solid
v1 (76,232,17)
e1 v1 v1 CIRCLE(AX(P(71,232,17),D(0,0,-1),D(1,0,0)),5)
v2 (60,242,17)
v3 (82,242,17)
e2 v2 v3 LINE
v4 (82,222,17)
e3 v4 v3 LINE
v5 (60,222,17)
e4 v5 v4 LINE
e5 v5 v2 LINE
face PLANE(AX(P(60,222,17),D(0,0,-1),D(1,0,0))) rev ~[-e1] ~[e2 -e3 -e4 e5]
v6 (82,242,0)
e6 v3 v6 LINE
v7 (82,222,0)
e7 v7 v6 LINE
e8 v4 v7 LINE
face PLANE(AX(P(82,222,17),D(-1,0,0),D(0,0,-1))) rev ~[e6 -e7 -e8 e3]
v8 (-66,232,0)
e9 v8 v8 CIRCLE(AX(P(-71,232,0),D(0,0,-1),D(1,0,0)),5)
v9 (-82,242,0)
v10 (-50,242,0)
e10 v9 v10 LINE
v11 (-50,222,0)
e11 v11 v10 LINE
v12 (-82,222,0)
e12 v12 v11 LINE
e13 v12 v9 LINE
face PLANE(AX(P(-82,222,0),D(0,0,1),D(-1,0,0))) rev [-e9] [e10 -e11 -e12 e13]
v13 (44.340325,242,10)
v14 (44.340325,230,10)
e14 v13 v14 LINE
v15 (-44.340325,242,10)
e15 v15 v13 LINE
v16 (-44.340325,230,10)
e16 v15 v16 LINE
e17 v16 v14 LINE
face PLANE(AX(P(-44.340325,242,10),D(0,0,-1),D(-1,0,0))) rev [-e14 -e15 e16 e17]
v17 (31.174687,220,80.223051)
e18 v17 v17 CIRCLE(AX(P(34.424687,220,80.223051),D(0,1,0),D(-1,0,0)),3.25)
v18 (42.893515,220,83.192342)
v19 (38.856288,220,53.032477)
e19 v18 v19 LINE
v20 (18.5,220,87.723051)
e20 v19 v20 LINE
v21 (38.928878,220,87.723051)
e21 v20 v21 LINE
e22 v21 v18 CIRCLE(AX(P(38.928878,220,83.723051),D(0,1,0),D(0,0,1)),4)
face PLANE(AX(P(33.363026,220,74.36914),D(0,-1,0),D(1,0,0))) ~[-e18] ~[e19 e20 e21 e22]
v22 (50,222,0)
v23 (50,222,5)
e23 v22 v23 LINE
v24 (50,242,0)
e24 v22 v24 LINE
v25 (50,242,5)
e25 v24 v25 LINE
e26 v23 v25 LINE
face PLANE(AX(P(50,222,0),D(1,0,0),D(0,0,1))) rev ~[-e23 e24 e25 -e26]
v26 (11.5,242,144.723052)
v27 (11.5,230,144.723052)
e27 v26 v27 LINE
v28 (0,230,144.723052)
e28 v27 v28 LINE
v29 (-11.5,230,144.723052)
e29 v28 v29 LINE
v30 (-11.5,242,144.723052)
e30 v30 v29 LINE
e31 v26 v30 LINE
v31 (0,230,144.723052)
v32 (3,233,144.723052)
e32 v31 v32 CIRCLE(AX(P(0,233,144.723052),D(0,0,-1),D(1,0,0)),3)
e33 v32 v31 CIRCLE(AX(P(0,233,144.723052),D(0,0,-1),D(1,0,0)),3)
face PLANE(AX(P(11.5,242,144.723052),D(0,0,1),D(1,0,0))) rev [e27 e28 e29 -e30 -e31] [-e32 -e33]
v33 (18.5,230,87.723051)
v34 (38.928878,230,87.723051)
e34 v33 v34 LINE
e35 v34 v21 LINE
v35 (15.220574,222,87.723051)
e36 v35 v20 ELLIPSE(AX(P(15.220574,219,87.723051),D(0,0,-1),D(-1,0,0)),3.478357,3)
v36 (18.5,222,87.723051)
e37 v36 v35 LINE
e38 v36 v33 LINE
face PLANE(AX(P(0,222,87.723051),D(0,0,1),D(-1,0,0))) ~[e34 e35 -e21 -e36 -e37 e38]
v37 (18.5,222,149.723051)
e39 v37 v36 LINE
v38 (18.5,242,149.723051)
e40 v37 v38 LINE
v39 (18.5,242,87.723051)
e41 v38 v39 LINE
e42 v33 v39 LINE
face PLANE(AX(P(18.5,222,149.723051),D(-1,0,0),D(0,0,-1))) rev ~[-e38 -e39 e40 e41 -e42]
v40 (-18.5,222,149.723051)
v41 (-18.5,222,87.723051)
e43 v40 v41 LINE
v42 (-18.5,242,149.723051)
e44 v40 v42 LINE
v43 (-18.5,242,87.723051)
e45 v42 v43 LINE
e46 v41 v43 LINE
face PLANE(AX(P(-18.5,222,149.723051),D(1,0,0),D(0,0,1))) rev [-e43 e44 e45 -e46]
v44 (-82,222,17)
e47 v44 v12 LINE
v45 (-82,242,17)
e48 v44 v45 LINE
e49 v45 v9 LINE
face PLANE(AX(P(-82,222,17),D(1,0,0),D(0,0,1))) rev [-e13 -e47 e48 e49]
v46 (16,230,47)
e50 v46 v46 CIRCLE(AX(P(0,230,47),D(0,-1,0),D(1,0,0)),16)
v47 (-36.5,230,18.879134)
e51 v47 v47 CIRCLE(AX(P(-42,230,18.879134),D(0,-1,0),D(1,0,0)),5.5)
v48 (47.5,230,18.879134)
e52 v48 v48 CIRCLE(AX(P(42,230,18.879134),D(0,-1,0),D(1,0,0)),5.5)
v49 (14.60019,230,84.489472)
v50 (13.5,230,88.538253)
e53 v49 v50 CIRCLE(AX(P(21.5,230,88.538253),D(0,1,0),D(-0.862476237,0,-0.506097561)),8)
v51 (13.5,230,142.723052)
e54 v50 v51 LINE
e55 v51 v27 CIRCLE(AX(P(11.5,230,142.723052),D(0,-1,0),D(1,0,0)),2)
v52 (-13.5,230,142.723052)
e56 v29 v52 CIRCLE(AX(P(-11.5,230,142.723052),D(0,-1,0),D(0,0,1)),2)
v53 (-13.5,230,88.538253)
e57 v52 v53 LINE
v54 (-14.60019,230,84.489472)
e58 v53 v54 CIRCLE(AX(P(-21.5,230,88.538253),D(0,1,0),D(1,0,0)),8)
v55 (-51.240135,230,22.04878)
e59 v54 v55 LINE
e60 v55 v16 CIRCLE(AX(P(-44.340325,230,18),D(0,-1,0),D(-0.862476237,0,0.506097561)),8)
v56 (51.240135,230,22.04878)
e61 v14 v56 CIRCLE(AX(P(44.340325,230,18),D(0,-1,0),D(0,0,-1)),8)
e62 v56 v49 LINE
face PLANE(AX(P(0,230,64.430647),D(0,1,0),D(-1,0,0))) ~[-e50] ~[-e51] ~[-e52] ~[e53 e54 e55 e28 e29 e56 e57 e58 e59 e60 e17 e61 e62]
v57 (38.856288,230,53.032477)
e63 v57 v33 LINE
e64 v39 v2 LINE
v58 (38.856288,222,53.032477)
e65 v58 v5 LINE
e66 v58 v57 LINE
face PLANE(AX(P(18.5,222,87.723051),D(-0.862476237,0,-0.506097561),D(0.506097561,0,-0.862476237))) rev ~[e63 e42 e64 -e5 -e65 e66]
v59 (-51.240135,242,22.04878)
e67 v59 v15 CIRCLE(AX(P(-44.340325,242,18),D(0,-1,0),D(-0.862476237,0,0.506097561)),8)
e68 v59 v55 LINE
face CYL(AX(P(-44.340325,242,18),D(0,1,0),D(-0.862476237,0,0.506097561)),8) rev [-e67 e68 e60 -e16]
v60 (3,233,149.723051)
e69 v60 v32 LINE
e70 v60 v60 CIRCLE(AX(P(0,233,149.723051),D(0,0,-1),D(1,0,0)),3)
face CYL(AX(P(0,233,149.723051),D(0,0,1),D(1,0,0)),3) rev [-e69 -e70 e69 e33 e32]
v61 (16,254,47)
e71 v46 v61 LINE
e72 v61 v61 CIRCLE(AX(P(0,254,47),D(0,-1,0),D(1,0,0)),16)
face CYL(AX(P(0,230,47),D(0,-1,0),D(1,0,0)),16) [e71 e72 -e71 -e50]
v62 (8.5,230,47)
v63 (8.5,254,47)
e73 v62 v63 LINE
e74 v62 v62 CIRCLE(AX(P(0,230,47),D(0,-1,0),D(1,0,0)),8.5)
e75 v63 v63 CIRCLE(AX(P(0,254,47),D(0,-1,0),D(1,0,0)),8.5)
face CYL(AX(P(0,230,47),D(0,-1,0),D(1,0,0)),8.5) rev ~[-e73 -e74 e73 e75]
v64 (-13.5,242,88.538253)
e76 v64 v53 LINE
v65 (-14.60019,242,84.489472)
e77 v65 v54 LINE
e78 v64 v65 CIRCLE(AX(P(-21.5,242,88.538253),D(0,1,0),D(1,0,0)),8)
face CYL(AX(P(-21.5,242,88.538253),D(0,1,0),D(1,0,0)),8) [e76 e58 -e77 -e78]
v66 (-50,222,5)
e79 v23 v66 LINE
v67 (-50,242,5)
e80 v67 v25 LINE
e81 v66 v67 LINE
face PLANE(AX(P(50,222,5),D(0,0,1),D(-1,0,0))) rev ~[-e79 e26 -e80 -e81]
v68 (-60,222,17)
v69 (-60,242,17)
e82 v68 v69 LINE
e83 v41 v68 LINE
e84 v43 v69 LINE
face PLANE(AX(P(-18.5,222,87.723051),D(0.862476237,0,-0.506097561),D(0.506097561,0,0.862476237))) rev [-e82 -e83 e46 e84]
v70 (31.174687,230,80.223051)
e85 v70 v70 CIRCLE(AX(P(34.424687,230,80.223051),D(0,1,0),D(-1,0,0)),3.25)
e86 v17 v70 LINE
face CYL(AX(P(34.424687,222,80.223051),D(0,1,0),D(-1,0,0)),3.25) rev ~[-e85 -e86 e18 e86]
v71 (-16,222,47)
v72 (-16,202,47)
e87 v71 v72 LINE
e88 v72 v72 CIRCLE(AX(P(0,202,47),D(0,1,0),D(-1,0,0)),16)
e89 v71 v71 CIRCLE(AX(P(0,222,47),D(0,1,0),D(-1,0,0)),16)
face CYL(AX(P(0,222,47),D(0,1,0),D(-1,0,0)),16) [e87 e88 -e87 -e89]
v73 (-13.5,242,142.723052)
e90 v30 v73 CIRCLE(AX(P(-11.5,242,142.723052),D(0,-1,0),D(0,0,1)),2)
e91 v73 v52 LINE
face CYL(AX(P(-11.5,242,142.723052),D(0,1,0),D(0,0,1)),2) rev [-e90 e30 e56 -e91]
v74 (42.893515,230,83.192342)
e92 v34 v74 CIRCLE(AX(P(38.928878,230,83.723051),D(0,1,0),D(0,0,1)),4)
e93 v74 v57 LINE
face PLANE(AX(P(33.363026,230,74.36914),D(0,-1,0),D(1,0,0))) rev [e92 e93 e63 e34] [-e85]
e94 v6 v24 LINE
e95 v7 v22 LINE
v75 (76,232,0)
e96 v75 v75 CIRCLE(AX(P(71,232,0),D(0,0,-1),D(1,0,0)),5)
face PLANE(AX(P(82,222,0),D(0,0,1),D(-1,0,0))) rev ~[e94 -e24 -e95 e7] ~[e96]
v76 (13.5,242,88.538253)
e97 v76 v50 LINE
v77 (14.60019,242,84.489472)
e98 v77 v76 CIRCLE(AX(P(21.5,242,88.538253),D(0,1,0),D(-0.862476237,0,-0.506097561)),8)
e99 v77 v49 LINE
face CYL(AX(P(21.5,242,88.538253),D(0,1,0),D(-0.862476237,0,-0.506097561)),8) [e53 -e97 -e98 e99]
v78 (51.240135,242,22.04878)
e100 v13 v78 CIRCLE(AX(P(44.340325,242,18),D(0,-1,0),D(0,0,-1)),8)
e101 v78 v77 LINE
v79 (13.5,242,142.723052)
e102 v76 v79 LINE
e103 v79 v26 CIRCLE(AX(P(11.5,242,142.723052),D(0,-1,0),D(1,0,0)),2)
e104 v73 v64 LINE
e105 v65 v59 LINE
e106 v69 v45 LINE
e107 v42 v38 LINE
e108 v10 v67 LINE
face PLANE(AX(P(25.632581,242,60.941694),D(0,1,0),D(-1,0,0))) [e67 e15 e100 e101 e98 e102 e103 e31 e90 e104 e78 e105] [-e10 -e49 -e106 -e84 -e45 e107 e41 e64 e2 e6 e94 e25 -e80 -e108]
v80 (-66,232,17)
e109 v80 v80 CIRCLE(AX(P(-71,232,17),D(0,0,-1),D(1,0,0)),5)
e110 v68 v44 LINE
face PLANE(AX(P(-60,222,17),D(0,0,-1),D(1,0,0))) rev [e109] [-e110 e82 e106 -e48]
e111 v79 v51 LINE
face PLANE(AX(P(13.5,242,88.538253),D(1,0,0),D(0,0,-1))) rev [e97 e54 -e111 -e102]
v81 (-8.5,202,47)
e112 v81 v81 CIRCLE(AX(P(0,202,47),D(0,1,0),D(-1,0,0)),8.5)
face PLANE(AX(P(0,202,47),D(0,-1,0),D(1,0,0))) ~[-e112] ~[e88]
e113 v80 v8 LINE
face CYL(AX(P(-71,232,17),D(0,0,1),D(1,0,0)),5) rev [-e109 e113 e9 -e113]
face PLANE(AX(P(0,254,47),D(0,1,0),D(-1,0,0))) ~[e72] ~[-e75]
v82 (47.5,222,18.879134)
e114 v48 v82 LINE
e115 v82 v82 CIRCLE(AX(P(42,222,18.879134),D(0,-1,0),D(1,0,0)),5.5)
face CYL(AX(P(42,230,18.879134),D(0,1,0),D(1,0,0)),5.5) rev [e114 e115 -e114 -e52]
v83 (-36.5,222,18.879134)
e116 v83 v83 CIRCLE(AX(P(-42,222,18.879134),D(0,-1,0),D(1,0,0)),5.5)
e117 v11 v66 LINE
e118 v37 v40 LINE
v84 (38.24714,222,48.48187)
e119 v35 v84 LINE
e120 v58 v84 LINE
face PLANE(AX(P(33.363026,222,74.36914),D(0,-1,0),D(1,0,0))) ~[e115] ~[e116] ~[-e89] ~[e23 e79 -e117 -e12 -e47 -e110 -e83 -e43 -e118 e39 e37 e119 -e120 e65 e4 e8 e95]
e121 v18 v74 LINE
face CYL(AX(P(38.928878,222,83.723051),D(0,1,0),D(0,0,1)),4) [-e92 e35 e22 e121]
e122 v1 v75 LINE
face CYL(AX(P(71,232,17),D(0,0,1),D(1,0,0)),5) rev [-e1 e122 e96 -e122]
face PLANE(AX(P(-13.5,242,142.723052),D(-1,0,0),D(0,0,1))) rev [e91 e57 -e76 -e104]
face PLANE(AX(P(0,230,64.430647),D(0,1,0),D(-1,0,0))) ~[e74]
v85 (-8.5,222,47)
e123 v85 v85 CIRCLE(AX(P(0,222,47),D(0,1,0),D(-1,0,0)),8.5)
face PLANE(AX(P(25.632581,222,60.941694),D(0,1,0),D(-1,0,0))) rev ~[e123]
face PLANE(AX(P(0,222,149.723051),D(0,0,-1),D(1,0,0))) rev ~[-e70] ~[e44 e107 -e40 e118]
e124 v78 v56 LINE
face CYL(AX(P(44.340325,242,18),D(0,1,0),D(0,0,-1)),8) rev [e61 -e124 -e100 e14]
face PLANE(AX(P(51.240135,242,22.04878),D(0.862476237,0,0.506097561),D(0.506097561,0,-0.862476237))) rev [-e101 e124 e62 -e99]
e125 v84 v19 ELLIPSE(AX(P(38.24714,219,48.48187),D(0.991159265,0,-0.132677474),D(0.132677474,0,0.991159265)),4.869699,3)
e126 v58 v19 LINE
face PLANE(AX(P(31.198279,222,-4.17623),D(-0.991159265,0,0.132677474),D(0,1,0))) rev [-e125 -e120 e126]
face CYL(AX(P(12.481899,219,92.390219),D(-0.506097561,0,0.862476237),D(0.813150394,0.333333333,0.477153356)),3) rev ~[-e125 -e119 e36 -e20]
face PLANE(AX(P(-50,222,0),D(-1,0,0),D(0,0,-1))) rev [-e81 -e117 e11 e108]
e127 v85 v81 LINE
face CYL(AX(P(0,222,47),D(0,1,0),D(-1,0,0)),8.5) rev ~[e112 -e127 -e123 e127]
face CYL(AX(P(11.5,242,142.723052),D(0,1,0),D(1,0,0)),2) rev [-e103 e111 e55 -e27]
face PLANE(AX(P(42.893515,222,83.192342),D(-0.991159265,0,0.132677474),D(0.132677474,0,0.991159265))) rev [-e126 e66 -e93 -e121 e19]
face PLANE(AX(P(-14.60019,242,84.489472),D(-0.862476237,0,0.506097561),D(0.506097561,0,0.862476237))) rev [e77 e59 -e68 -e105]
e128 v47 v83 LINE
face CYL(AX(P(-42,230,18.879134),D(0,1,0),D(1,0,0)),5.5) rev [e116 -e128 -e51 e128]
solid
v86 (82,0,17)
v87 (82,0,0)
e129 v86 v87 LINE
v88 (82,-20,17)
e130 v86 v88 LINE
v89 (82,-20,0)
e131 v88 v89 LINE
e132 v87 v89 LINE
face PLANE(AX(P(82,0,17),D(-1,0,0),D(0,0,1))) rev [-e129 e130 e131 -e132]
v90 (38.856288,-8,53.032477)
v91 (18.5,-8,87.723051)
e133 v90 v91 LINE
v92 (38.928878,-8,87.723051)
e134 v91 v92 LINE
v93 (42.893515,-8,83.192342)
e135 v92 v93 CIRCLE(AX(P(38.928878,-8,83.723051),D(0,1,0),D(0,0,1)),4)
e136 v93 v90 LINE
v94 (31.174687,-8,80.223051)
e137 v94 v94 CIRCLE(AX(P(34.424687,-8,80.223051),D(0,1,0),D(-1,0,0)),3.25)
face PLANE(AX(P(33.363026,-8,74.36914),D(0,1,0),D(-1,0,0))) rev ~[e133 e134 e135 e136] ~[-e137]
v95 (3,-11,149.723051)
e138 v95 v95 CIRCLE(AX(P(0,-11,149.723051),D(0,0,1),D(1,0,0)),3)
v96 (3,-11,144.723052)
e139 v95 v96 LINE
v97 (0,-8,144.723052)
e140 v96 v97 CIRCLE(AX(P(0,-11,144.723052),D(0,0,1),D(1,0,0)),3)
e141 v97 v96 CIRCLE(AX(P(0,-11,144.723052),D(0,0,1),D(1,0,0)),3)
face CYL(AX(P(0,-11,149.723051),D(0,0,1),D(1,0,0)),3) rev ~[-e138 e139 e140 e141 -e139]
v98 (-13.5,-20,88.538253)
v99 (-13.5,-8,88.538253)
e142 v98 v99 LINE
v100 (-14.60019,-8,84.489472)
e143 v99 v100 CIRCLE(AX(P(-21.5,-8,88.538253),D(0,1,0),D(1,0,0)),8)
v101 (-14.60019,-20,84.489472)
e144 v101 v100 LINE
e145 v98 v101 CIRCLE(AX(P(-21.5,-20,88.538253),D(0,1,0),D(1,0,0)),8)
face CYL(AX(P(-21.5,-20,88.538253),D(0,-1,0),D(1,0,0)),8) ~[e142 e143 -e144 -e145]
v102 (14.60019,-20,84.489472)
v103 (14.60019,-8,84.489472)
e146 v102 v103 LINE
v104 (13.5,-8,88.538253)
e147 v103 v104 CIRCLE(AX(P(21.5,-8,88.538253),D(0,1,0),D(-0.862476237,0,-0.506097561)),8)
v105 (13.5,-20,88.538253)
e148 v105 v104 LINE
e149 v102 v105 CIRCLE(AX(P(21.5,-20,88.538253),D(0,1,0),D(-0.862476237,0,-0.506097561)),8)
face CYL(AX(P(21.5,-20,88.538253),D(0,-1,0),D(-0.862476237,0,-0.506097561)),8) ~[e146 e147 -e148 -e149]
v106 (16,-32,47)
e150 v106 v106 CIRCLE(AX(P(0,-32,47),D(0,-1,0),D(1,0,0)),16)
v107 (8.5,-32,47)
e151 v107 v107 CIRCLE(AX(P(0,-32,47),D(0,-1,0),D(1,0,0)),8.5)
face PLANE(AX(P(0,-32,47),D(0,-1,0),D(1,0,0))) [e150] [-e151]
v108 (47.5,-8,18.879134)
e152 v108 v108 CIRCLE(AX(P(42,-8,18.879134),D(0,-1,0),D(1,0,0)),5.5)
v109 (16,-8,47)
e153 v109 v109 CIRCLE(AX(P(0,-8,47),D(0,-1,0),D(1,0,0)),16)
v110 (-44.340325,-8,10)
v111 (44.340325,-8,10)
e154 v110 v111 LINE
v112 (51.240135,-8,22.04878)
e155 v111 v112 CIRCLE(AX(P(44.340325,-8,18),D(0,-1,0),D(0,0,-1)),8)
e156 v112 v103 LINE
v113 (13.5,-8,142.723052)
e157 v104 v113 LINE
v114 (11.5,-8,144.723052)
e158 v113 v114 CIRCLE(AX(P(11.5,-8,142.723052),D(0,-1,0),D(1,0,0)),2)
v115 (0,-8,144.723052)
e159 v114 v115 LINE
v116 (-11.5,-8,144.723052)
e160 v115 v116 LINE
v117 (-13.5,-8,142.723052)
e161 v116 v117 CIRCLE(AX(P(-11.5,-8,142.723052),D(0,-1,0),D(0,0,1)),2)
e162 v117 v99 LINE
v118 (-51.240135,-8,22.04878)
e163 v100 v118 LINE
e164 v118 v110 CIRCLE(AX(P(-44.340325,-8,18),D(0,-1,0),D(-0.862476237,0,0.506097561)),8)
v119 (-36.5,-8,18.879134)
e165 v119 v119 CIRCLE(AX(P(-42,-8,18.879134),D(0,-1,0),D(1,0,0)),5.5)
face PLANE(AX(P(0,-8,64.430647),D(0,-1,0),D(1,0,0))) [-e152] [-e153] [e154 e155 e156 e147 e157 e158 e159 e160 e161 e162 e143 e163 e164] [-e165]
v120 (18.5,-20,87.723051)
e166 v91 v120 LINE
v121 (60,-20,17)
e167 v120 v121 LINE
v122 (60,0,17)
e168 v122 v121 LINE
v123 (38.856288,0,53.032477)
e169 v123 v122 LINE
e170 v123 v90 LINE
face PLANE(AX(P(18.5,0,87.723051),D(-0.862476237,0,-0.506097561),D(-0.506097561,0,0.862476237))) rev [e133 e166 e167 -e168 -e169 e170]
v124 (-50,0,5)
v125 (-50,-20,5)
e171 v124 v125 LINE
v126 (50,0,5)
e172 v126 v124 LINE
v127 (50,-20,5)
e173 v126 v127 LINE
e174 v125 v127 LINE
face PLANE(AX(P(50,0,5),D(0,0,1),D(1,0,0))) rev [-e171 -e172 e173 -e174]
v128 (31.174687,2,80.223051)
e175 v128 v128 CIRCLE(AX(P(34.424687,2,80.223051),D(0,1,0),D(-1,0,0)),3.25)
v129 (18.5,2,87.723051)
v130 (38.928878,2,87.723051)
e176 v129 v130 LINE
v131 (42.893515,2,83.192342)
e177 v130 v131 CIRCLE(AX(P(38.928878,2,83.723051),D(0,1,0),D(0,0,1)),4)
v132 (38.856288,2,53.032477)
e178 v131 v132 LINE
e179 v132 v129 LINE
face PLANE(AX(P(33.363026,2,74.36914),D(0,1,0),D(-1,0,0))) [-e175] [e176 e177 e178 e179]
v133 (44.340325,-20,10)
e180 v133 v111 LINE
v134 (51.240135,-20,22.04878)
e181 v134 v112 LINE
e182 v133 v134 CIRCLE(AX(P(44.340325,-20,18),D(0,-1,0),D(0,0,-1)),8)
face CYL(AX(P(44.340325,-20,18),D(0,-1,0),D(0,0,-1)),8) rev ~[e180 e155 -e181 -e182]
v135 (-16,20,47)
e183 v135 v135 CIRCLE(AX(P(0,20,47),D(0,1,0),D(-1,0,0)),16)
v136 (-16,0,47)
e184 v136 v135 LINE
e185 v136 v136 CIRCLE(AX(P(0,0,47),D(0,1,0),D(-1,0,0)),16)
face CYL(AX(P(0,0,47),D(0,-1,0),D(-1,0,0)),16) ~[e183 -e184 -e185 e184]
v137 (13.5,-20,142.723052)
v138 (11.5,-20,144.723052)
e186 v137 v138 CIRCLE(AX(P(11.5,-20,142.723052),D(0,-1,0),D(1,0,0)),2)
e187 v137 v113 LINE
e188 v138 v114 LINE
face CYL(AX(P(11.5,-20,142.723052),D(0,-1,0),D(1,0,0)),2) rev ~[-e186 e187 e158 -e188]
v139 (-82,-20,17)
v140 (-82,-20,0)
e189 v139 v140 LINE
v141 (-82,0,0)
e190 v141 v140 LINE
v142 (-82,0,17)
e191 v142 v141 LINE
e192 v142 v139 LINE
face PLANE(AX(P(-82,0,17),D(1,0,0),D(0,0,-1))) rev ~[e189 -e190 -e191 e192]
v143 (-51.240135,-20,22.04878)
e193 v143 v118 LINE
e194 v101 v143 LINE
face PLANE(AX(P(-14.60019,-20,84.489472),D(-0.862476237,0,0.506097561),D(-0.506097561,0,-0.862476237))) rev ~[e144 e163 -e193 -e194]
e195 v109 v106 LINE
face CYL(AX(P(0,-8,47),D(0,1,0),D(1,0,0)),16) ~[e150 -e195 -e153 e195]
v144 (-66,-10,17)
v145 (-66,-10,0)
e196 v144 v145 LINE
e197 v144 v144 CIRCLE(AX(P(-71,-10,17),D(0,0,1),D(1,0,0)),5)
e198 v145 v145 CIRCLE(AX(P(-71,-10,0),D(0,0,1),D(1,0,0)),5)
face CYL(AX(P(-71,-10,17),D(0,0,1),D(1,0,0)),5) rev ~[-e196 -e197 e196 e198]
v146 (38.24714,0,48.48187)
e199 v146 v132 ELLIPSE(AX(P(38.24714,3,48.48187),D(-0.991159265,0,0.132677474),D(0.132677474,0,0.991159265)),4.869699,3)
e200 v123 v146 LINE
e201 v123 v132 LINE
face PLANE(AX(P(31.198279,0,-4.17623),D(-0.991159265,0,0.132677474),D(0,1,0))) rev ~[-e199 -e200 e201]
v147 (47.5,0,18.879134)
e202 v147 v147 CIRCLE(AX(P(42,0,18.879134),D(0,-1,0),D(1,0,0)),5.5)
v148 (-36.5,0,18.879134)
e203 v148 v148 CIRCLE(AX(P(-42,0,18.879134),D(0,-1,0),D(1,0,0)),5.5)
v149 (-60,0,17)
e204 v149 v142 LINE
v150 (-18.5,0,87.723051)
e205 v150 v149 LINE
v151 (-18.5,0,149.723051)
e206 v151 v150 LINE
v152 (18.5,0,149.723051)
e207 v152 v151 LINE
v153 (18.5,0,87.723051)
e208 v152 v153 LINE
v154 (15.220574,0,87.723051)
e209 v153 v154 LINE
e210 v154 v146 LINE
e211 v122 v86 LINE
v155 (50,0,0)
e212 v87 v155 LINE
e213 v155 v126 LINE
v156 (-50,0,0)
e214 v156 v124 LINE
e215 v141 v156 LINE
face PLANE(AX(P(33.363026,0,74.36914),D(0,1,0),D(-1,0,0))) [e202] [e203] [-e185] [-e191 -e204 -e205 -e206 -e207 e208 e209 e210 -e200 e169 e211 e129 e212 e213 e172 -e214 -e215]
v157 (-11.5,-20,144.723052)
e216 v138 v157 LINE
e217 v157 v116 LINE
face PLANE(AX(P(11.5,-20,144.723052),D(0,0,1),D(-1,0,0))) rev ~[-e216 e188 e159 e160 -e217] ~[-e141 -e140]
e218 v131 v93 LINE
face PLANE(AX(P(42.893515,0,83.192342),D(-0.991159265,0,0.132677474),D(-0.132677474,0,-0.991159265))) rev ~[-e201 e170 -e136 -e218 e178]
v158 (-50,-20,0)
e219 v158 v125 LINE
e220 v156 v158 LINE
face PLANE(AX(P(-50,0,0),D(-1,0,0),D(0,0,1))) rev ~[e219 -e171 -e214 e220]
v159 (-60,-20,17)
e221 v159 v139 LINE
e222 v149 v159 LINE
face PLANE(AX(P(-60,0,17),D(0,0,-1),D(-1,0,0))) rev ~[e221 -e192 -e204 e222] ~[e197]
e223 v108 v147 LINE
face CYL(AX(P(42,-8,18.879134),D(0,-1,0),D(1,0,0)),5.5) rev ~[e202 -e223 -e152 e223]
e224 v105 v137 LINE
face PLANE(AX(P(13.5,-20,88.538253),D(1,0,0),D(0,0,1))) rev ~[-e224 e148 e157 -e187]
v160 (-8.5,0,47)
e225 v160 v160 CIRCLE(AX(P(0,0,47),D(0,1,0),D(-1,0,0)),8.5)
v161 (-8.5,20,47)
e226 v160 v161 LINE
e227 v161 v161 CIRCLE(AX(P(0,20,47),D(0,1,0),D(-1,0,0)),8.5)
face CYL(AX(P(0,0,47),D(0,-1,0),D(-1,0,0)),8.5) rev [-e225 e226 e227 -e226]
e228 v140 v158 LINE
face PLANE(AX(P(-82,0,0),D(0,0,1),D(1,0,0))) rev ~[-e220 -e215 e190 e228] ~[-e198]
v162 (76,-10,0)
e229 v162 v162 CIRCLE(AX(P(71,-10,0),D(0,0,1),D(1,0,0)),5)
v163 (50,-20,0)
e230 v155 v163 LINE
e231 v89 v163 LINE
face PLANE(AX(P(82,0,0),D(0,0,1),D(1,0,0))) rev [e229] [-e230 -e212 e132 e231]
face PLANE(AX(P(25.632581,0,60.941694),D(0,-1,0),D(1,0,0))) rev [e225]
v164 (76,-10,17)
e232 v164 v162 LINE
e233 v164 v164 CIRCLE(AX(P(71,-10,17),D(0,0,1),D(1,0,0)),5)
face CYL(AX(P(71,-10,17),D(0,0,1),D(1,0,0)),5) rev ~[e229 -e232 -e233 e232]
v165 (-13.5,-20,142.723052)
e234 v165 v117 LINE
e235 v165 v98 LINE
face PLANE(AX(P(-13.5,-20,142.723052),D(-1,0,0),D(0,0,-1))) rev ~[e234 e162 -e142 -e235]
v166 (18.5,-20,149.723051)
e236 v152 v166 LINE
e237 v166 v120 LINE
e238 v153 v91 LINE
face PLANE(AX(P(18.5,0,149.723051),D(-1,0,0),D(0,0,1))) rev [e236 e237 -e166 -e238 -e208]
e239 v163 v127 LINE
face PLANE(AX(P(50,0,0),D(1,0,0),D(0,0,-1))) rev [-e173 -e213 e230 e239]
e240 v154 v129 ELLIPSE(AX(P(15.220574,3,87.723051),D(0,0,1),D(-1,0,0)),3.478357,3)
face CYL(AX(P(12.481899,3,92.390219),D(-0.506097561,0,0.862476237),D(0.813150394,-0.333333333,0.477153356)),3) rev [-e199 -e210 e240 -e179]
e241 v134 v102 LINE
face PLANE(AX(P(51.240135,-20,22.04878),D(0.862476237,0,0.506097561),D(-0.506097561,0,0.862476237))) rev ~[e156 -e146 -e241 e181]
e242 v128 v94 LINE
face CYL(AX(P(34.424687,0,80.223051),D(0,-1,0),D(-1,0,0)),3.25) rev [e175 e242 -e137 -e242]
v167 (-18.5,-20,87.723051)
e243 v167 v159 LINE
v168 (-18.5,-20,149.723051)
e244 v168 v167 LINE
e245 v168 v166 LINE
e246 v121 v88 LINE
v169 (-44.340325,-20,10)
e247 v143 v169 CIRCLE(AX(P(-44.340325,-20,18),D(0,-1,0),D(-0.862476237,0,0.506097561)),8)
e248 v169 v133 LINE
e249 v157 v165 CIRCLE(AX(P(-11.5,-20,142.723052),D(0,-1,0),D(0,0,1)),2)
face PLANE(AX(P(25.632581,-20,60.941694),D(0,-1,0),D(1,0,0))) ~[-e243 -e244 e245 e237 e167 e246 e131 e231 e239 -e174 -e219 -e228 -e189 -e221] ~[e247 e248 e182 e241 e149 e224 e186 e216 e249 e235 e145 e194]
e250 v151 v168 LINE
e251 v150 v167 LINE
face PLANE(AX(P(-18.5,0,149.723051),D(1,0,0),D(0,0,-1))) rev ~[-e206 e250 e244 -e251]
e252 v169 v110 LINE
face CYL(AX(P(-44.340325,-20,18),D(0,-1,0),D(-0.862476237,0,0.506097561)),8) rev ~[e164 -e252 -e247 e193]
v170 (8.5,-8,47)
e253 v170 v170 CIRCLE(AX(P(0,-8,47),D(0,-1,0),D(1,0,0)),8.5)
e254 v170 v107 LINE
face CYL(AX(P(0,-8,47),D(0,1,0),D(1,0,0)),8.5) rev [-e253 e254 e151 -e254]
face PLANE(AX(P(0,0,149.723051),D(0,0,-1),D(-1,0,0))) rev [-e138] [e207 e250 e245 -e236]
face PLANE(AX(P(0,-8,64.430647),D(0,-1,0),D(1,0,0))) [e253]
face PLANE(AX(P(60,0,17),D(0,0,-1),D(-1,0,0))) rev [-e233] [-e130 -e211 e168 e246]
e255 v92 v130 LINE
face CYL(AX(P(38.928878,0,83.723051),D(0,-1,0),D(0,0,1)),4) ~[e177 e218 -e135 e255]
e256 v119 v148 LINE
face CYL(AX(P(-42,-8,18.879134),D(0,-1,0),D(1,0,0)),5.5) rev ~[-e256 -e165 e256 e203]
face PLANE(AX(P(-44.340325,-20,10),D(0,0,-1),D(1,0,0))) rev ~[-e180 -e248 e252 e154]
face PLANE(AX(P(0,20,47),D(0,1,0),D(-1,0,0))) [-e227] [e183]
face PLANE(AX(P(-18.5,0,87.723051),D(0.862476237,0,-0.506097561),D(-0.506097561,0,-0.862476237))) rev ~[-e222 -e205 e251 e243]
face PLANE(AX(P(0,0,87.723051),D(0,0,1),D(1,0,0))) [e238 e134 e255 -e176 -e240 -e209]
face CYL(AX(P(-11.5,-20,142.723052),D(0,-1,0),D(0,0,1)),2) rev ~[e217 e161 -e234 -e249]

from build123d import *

# Parameters (mm, degrees)
F1_DEPTH       = 20
F4_DEPTH       = 12
F5_R           = 5.5
F6_DEPTH       = 25
F7_R           = 16
F7_R_2         = 8.5
F8_DEPTH       = 24
F9_R           = 16
F9_R_2         = 8.5
F10_DEPTH      = 20
F11_R          = 5
F12_DEPTH      = 25
F13_R          = 3
F14_DEPTH      = 10
F16_R          = 3.25
F17_DEPTH      = 8
F17_DEPTH_BACK = 2
F18_T4_DEPTH   = 54.3641994781


# Not quite as in the source:
# - a fillet or chamfer that OpenCascade refuses, or shapes differently, is made with other operations: its cross-section is extruded or revolved along the edge and cut away or added


with BuildPart() as f1:
    # F0 (on Front) → F1 (new body)
    with BuildSketch(Plane.XZ):
        Polygon((0, 149.7230514048), (-18.5, 149.7230514048), (-18.5, 87.7230514048), (-60, 17), (-82, 17), (-82, 0), (-50, 0), (-50, 5), (0, 5), align=None)
    extrude(amount=F1_DEPTH)

    # F2: F1 across plane


with BuildPart() as f1_1:
    add(f1.part)
    add(f1.part.mirror(Plane.YZ))

    # F3 (on face) → F4 (cut)
    with BuildSketch(Plane.XZ.offset(20)):
        with BuildLine():
            ThreePointArc((44.3403253904, 9.9999997765), (51.2825960529, 14.0244648378), (51.2401352836, 22.0487802643))
            Line((51.2401352836, 22.0487802643), (14.6001903304, 84.489472081))
            ThreePointArc((14.6001903304, 84.489472081), (13.7799458472, 86.4404536205), (13.5000002235, 88.5382525688))
            Line((13.5000002235, 88.5382525688), (13.5000002235, 142.7230516283))
            ThreePointArc((13.5000002235, 142.7230516283), (12.9142137859, 144.1372651906), (11.5000002235, 144.7230516283))
            Line((11.5000002235, 144.7230516283), (-11.5000002235, 144.7230516283))
            ThreePointArc((-11.5000002235, 144.7230516283), (-12.9142137859, 144.1372651906), (-13.5000002235, 142.7230516283))
            Line((-13.5000002235, 142.7230516283), (-13.5000002235, 88.5382525688))
            ThreePointArc((-13.5000002235, 88.5382525688), (-13.7799458472, 86.4404536205), (-14.6001903304, 84.489472081))
            Line((-14.6001903304, 84.489472081), (-51.2401352836, 22.0487802643))
            ThreePointArc((-51.2401352836, 22.0487802643), (-51.2825960529, 14.0244648378), (-44.3403253904, 9.9999997765))
            Line((-44.3403253904, 9.9999997765), (44.3403253904, 9.9999997765))
        make_face()
    extrude(amount=-F4_DEPTH, mode=Mode.SUBTRACT)

    # F5 (on face) → F6 (cut)
    with BuildSketch(Plane.XZ.offset(8)):
        with Locations((-42, 18.8791340478)):
            Circle(F5_R)
        with Locations((42, 18.8791340478)):
            Circle(F5_R)
    extrude(amount=-F6_DEPTH, mode=Mode.SUBTRACT)

    # F7 (on face) → F8 (join)
    with BuildSketch(Plane.XZ.offset(8)):
        with Locations((0, 46.9999997765)):
            Circle(F7_R)
        with Locations((0, 46.9999997765)):
            Circle(F7_R_2, mode=Mode.SUBTRACT)
    extrude(amount=F8_DEPTH)

    # F9 (on face) → F10 (join)
    with BuildSketch(Plane(origin=(0, 0, 0), x_dir=(-1, 0, 0), z_dir=(0, 1, 0))):
        with Locations((0, 46.9999997765)):
            Circle(F9_R)
        with Locations((0, 46.9999997765)):
            Circle(F9_R_2, mode=Mode.SUBTRACT)
    extrude(amount=F10_DEPTH)

    # F11 (on face) → F12 (cut)
    with BuildSketch(Plane.XY.offset(17)):
        with Locations((-71, -10)):
            Circle(F11_R)
        with Locations((71, -10)):
            Circle(F11_R)
    extrude(amount=-F12_DEPTH, mode=Mode.SUBTRACT)

    # F13 (on face) → F14 (cut)
    with BuildSketch(Plane.XY.offset(149.7230514048)):
        with Locations((0, -11)):
            Circle(F13_R)
    extrude(amount=-F14_DEPTH, mode=Mode.SUBTRACT)

    # F16 (on face) → F17 (join, two sides)
    with BuildSketch(Plane(origin=(0, 0, 0), x_dir=(-1, 0, 0), z_dir=(0, 1, 0))) as f17_sk:
        with BuildLine():
            Line((-38.8562884141, 53.0324771416), (-18.5, 87.7230514048))
            Line((-18.5, 87.7230514048), (-38.9288780249, 87.7230514048))
            ThreePointArc((-38.9288780249, 87.7230514048), (-41.9390972513, 86.3571698928), (-42.8935150835, 83.1923415092))
            Line((-42.8935150835, 83.1923415092), (-38.8562884141, 53.0324771416))
        make_face()
        with Locations((-34.4246865011, 80.2230514048)):
            Circle(F16_R, mode=Mode.SUBTRACT)
    extrude(amount=-F17_DEPTH)
    extrude(f17_sk.sketch, amount=F17_DEPTH_BACK)

    # F18: fillet of radius 3 on 1 edges, made by hand


with BuildPart() as f18_tool2:
    # F18_s3 → F18_t4 (new body)
    with BuildSketch(Plane(origin=(-37.1310167355, 0, 63.2775615735), x_dir=(0, 1, 0), z_dir=(0.506097561, 0, -0.8624762366))):
        with BuildLine():
            ThreePointArc((2, 60.3522327352), (0.5505102572, 59.255856418), (0, 57.5238056104))
            Line((0, 57.5238056104), (0, 60.3522327352))
            Line((0, 60.3522327352), (2, 60.3522327352))
        make_face()
    extrude(amount=F18_T4_DEPTH)

    split(bisect_by=Plane(origin=(31.1982792576, 0, -4.176229824), x_dir=(0, 1, 0), z_dir=(-0.9911592647, 0, 0.1326774739)), keep=Keep.TOP)

    split(bisect_by=Plane.XY.offset(87.7230514048), keep=Keep.BOTTOM)


with BuildPart() as f1_2:
    add(f1_1.part)

    # F18_t1: union F18_tool2
    add(f18_tool2.part)


with BuildPart() as f19_1:
    # F19: instance of F1
    add(f1_2.part.mirror(Plane(origin=(0, 111, 55.7488868878), x_dir=(-1, 0, 0), z_dir=(0, 1, 0))))


solid = Compound([f1_2.part, f19_1.part])
